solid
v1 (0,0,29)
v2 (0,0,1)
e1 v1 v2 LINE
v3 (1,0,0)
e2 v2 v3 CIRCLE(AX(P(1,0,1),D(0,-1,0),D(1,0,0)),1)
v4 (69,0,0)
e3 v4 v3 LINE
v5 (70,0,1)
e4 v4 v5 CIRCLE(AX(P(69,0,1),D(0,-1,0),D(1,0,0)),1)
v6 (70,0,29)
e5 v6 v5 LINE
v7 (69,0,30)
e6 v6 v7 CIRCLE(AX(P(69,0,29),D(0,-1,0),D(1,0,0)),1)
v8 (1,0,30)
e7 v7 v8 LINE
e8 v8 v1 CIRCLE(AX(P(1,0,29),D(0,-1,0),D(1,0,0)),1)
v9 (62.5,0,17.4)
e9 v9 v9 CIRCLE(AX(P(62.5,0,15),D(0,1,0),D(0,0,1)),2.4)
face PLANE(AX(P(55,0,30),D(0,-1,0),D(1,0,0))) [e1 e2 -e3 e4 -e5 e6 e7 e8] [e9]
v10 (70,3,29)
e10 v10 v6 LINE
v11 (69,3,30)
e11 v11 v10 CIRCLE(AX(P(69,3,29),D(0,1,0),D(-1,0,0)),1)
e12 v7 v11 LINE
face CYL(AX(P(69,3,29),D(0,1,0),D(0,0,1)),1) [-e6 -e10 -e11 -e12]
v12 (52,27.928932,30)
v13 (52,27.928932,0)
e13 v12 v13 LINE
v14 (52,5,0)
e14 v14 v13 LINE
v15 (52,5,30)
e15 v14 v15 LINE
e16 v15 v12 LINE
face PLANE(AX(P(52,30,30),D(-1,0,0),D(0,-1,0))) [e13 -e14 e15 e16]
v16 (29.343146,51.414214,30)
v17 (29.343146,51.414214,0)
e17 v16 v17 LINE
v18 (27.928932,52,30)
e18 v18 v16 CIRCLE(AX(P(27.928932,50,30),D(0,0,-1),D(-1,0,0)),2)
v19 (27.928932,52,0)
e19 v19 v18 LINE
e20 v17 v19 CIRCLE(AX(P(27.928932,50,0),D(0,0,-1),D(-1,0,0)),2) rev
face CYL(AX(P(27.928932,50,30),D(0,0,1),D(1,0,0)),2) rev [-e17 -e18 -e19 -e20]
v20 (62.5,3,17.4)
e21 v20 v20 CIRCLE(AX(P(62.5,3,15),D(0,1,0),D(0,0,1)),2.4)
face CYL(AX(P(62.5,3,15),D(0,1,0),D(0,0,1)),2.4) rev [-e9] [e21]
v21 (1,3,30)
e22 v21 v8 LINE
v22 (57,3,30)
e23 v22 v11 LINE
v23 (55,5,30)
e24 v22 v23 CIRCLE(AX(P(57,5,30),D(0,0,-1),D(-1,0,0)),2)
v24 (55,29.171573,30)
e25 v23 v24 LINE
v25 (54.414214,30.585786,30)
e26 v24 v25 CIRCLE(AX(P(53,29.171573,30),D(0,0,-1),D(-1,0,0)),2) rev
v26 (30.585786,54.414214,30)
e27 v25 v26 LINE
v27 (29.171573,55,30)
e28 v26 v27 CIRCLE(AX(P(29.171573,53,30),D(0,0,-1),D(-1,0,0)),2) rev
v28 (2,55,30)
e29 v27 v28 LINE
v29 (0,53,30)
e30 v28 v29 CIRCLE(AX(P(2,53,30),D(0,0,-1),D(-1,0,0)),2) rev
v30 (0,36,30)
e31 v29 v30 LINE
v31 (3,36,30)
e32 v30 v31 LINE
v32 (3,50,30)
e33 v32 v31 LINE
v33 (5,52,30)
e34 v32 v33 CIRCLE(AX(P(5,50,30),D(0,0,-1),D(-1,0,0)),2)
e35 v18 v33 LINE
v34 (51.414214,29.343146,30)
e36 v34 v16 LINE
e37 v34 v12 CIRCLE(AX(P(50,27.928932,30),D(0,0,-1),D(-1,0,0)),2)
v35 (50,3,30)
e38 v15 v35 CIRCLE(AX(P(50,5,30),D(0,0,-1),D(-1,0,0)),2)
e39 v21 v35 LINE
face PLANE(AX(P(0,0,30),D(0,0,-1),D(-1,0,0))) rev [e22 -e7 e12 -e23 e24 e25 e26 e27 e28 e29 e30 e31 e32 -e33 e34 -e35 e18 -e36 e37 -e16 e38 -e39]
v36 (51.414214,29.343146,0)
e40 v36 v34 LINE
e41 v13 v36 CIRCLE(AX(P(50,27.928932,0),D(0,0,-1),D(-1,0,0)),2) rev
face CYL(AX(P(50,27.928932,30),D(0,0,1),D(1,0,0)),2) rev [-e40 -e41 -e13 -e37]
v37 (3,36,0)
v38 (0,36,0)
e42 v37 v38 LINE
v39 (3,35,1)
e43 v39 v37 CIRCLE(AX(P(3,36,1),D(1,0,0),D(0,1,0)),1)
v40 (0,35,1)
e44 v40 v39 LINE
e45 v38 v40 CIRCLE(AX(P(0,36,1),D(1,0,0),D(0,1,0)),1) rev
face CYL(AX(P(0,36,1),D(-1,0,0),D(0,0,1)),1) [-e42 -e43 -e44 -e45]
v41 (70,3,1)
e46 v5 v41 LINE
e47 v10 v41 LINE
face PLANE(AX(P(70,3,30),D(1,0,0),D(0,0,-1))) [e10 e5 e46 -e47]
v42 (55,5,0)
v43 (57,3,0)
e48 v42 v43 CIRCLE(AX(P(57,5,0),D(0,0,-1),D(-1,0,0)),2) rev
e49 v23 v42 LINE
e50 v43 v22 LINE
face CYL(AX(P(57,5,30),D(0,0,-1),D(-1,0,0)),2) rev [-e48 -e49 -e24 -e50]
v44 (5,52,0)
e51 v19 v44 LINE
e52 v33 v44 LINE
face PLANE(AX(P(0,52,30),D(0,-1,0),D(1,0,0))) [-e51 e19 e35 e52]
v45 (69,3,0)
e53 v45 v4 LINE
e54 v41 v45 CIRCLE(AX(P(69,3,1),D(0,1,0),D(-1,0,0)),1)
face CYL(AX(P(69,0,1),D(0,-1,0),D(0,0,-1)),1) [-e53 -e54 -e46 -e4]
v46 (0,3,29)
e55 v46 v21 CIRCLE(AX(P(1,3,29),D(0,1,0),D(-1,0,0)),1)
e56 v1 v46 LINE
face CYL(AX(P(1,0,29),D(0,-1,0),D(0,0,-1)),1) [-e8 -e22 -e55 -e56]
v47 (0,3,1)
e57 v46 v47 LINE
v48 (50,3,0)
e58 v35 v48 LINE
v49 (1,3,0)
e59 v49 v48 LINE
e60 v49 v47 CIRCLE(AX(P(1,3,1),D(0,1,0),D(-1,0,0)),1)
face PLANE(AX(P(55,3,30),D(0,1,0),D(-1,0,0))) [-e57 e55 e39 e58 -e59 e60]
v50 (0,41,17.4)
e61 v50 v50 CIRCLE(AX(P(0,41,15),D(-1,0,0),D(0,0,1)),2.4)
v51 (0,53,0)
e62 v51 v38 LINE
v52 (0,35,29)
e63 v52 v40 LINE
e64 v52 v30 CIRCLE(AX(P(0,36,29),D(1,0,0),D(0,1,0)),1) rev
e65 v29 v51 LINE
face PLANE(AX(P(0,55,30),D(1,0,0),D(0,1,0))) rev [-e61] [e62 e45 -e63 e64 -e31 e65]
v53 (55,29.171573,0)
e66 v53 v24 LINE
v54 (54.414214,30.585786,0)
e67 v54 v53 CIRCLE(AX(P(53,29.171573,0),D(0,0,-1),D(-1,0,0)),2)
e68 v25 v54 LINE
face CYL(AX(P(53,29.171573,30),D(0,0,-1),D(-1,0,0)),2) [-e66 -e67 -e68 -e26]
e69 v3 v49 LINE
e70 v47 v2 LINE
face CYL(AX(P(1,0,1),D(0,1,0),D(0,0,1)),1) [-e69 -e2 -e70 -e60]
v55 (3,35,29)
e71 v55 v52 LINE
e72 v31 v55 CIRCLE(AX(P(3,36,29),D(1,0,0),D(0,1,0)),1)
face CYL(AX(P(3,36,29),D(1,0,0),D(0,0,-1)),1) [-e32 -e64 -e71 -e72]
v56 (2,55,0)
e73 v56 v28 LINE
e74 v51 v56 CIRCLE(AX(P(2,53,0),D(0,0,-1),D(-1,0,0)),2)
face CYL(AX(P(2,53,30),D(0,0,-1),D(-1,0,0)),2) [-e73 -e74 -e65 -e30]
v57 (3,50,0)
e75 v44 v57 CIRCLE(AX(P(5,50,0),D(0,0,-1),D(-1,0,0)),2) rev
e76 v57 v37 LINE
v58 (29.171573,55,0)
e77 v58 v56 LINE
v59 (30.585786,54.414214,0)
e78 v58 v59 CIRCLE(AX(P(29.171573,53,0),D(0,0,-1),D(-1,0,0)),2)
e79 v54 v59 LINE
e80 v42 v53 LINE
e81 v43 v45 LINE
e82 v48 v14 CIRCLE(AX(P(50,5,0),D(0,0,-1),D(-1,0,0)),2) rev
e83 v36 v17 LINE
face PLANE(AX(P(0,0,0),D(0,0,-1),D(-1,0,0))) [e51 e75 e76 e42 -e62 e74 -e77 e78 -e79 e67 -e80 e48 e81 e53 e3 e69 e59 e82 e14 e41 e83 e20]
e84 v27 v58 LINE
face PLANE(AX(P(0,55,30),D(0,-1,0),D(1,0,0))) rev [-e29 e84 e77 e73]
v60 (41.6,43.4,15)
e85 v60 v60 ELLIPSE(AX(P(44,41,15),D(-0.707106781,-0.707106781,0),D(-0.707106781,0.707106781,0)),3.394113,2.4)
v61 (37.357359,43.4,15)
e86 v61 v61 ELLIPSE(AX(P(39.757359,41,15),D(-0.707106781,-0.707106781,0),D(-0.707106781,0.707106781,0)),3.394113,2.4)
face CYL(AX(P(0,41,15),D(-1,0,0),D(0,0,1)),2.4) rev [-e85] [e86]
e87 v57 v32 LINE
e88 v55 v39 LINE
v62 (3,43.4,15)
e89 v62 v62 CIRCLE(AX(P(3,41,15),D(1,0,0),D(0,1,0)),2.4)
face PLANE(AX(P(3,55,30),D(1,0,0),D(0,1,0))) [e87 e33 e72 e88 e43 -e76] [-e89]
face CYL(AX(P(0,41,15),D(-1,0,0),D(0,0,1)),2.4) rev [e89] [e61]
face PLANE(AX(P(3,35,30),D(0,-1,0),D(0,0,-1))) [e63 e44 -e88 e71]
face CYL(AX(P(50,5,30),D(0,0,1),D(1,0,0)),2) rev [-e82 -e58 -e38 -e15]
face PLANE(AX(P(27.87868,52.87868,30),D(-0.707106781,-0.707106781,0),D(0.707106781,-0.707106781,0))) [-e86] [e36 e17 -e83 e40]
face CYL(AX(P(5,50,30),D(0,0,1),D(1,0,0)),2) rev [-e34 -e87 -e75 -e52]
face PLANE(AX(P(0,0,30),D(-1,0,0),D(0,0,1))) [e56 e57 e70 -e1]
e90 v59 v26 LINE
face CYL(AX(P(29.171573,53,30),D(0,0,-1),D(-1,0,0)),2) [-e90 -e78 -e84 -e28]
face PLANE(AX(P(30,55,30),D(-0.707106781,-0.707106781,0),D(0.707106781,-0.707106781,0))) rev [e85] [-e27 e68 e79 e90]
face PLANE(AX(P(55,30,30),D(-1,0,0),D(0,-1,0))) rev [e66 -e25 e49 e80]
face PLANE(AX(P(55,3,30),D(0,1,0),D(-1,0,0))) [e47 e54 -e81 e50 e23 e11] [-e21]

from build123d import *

# Parameters (mm, degrees)
EXTRUDE_THIN1_DEPTH  = 30
M4_CLEARANCE_HOLE1_D = 4.8
M4_CLEARANCE_HOLE2_D = 4.8
FILLET1_R            = 1
FILLET2_R            = 2


# Read off the part's stored shape, not the designer's step: Extrude-Thin1
with BuildPart() as part:
    # Extrude-Thin1 outline → Extrude-Thin1 (new body)
    with BuildSketch(Plane.XY):
        Polygon((0, 3), (0, 0), (70, 0), (70, 3), (55, 3), (55, 30), (30, 55), (0, 55), (0, 35), (3, 35), (3, 52), (28.757359313, 52), (52, 28.757359313), (52, 3), align=None)
    extrude(amount=EXTRUDE_THIN1_DEPTH)

    # M4 Clearance Hole1 (through all)
    with Locations(Plane.ZY):
        with Locations((15, 41)):
            Hole(M4_CLEARANCE_HOLE1_D / 2)

    # M4 Clearance Hole2 (through all)
    with Locations(Plane(origin=(0, 3, 0), x_dir=(1, 0, 0), z_dir=(0, 1, 0))):
        with Locations((62.5, -15)):
            Hole(M4_CLEARANCE_HOLE2_D / 2)

    # Fillet1
    fillet1_edges = [part.edges().sort_by_distance(p)[0] for p in [
        (1.5, 35, 0),
        (1.5, 35, 30),
        (0, 1.5, 0),
        (0, 1.5, 30),
        (70, 1.5, 0),
        (70, 1.5, 30),
    ]]
    fillet(fillet1_edges, radius=FILLET1_R)

    # Fillet2
    fillet2_edges = [part.edges().sort_by_distance(p)[0] for p in [
        (0, 55, 15),
        (30, 55, 15),
        (55, 30, 15),
        (52, 28.757359313, 15),
        (28.757359313, 52, 15),
        (3, 52, 15),
        (55, 3, 15),
        (52, 3, 15),
    ]]
    fillet(fillet2_edges, radius=FILLET2_R)


solid = part.part
